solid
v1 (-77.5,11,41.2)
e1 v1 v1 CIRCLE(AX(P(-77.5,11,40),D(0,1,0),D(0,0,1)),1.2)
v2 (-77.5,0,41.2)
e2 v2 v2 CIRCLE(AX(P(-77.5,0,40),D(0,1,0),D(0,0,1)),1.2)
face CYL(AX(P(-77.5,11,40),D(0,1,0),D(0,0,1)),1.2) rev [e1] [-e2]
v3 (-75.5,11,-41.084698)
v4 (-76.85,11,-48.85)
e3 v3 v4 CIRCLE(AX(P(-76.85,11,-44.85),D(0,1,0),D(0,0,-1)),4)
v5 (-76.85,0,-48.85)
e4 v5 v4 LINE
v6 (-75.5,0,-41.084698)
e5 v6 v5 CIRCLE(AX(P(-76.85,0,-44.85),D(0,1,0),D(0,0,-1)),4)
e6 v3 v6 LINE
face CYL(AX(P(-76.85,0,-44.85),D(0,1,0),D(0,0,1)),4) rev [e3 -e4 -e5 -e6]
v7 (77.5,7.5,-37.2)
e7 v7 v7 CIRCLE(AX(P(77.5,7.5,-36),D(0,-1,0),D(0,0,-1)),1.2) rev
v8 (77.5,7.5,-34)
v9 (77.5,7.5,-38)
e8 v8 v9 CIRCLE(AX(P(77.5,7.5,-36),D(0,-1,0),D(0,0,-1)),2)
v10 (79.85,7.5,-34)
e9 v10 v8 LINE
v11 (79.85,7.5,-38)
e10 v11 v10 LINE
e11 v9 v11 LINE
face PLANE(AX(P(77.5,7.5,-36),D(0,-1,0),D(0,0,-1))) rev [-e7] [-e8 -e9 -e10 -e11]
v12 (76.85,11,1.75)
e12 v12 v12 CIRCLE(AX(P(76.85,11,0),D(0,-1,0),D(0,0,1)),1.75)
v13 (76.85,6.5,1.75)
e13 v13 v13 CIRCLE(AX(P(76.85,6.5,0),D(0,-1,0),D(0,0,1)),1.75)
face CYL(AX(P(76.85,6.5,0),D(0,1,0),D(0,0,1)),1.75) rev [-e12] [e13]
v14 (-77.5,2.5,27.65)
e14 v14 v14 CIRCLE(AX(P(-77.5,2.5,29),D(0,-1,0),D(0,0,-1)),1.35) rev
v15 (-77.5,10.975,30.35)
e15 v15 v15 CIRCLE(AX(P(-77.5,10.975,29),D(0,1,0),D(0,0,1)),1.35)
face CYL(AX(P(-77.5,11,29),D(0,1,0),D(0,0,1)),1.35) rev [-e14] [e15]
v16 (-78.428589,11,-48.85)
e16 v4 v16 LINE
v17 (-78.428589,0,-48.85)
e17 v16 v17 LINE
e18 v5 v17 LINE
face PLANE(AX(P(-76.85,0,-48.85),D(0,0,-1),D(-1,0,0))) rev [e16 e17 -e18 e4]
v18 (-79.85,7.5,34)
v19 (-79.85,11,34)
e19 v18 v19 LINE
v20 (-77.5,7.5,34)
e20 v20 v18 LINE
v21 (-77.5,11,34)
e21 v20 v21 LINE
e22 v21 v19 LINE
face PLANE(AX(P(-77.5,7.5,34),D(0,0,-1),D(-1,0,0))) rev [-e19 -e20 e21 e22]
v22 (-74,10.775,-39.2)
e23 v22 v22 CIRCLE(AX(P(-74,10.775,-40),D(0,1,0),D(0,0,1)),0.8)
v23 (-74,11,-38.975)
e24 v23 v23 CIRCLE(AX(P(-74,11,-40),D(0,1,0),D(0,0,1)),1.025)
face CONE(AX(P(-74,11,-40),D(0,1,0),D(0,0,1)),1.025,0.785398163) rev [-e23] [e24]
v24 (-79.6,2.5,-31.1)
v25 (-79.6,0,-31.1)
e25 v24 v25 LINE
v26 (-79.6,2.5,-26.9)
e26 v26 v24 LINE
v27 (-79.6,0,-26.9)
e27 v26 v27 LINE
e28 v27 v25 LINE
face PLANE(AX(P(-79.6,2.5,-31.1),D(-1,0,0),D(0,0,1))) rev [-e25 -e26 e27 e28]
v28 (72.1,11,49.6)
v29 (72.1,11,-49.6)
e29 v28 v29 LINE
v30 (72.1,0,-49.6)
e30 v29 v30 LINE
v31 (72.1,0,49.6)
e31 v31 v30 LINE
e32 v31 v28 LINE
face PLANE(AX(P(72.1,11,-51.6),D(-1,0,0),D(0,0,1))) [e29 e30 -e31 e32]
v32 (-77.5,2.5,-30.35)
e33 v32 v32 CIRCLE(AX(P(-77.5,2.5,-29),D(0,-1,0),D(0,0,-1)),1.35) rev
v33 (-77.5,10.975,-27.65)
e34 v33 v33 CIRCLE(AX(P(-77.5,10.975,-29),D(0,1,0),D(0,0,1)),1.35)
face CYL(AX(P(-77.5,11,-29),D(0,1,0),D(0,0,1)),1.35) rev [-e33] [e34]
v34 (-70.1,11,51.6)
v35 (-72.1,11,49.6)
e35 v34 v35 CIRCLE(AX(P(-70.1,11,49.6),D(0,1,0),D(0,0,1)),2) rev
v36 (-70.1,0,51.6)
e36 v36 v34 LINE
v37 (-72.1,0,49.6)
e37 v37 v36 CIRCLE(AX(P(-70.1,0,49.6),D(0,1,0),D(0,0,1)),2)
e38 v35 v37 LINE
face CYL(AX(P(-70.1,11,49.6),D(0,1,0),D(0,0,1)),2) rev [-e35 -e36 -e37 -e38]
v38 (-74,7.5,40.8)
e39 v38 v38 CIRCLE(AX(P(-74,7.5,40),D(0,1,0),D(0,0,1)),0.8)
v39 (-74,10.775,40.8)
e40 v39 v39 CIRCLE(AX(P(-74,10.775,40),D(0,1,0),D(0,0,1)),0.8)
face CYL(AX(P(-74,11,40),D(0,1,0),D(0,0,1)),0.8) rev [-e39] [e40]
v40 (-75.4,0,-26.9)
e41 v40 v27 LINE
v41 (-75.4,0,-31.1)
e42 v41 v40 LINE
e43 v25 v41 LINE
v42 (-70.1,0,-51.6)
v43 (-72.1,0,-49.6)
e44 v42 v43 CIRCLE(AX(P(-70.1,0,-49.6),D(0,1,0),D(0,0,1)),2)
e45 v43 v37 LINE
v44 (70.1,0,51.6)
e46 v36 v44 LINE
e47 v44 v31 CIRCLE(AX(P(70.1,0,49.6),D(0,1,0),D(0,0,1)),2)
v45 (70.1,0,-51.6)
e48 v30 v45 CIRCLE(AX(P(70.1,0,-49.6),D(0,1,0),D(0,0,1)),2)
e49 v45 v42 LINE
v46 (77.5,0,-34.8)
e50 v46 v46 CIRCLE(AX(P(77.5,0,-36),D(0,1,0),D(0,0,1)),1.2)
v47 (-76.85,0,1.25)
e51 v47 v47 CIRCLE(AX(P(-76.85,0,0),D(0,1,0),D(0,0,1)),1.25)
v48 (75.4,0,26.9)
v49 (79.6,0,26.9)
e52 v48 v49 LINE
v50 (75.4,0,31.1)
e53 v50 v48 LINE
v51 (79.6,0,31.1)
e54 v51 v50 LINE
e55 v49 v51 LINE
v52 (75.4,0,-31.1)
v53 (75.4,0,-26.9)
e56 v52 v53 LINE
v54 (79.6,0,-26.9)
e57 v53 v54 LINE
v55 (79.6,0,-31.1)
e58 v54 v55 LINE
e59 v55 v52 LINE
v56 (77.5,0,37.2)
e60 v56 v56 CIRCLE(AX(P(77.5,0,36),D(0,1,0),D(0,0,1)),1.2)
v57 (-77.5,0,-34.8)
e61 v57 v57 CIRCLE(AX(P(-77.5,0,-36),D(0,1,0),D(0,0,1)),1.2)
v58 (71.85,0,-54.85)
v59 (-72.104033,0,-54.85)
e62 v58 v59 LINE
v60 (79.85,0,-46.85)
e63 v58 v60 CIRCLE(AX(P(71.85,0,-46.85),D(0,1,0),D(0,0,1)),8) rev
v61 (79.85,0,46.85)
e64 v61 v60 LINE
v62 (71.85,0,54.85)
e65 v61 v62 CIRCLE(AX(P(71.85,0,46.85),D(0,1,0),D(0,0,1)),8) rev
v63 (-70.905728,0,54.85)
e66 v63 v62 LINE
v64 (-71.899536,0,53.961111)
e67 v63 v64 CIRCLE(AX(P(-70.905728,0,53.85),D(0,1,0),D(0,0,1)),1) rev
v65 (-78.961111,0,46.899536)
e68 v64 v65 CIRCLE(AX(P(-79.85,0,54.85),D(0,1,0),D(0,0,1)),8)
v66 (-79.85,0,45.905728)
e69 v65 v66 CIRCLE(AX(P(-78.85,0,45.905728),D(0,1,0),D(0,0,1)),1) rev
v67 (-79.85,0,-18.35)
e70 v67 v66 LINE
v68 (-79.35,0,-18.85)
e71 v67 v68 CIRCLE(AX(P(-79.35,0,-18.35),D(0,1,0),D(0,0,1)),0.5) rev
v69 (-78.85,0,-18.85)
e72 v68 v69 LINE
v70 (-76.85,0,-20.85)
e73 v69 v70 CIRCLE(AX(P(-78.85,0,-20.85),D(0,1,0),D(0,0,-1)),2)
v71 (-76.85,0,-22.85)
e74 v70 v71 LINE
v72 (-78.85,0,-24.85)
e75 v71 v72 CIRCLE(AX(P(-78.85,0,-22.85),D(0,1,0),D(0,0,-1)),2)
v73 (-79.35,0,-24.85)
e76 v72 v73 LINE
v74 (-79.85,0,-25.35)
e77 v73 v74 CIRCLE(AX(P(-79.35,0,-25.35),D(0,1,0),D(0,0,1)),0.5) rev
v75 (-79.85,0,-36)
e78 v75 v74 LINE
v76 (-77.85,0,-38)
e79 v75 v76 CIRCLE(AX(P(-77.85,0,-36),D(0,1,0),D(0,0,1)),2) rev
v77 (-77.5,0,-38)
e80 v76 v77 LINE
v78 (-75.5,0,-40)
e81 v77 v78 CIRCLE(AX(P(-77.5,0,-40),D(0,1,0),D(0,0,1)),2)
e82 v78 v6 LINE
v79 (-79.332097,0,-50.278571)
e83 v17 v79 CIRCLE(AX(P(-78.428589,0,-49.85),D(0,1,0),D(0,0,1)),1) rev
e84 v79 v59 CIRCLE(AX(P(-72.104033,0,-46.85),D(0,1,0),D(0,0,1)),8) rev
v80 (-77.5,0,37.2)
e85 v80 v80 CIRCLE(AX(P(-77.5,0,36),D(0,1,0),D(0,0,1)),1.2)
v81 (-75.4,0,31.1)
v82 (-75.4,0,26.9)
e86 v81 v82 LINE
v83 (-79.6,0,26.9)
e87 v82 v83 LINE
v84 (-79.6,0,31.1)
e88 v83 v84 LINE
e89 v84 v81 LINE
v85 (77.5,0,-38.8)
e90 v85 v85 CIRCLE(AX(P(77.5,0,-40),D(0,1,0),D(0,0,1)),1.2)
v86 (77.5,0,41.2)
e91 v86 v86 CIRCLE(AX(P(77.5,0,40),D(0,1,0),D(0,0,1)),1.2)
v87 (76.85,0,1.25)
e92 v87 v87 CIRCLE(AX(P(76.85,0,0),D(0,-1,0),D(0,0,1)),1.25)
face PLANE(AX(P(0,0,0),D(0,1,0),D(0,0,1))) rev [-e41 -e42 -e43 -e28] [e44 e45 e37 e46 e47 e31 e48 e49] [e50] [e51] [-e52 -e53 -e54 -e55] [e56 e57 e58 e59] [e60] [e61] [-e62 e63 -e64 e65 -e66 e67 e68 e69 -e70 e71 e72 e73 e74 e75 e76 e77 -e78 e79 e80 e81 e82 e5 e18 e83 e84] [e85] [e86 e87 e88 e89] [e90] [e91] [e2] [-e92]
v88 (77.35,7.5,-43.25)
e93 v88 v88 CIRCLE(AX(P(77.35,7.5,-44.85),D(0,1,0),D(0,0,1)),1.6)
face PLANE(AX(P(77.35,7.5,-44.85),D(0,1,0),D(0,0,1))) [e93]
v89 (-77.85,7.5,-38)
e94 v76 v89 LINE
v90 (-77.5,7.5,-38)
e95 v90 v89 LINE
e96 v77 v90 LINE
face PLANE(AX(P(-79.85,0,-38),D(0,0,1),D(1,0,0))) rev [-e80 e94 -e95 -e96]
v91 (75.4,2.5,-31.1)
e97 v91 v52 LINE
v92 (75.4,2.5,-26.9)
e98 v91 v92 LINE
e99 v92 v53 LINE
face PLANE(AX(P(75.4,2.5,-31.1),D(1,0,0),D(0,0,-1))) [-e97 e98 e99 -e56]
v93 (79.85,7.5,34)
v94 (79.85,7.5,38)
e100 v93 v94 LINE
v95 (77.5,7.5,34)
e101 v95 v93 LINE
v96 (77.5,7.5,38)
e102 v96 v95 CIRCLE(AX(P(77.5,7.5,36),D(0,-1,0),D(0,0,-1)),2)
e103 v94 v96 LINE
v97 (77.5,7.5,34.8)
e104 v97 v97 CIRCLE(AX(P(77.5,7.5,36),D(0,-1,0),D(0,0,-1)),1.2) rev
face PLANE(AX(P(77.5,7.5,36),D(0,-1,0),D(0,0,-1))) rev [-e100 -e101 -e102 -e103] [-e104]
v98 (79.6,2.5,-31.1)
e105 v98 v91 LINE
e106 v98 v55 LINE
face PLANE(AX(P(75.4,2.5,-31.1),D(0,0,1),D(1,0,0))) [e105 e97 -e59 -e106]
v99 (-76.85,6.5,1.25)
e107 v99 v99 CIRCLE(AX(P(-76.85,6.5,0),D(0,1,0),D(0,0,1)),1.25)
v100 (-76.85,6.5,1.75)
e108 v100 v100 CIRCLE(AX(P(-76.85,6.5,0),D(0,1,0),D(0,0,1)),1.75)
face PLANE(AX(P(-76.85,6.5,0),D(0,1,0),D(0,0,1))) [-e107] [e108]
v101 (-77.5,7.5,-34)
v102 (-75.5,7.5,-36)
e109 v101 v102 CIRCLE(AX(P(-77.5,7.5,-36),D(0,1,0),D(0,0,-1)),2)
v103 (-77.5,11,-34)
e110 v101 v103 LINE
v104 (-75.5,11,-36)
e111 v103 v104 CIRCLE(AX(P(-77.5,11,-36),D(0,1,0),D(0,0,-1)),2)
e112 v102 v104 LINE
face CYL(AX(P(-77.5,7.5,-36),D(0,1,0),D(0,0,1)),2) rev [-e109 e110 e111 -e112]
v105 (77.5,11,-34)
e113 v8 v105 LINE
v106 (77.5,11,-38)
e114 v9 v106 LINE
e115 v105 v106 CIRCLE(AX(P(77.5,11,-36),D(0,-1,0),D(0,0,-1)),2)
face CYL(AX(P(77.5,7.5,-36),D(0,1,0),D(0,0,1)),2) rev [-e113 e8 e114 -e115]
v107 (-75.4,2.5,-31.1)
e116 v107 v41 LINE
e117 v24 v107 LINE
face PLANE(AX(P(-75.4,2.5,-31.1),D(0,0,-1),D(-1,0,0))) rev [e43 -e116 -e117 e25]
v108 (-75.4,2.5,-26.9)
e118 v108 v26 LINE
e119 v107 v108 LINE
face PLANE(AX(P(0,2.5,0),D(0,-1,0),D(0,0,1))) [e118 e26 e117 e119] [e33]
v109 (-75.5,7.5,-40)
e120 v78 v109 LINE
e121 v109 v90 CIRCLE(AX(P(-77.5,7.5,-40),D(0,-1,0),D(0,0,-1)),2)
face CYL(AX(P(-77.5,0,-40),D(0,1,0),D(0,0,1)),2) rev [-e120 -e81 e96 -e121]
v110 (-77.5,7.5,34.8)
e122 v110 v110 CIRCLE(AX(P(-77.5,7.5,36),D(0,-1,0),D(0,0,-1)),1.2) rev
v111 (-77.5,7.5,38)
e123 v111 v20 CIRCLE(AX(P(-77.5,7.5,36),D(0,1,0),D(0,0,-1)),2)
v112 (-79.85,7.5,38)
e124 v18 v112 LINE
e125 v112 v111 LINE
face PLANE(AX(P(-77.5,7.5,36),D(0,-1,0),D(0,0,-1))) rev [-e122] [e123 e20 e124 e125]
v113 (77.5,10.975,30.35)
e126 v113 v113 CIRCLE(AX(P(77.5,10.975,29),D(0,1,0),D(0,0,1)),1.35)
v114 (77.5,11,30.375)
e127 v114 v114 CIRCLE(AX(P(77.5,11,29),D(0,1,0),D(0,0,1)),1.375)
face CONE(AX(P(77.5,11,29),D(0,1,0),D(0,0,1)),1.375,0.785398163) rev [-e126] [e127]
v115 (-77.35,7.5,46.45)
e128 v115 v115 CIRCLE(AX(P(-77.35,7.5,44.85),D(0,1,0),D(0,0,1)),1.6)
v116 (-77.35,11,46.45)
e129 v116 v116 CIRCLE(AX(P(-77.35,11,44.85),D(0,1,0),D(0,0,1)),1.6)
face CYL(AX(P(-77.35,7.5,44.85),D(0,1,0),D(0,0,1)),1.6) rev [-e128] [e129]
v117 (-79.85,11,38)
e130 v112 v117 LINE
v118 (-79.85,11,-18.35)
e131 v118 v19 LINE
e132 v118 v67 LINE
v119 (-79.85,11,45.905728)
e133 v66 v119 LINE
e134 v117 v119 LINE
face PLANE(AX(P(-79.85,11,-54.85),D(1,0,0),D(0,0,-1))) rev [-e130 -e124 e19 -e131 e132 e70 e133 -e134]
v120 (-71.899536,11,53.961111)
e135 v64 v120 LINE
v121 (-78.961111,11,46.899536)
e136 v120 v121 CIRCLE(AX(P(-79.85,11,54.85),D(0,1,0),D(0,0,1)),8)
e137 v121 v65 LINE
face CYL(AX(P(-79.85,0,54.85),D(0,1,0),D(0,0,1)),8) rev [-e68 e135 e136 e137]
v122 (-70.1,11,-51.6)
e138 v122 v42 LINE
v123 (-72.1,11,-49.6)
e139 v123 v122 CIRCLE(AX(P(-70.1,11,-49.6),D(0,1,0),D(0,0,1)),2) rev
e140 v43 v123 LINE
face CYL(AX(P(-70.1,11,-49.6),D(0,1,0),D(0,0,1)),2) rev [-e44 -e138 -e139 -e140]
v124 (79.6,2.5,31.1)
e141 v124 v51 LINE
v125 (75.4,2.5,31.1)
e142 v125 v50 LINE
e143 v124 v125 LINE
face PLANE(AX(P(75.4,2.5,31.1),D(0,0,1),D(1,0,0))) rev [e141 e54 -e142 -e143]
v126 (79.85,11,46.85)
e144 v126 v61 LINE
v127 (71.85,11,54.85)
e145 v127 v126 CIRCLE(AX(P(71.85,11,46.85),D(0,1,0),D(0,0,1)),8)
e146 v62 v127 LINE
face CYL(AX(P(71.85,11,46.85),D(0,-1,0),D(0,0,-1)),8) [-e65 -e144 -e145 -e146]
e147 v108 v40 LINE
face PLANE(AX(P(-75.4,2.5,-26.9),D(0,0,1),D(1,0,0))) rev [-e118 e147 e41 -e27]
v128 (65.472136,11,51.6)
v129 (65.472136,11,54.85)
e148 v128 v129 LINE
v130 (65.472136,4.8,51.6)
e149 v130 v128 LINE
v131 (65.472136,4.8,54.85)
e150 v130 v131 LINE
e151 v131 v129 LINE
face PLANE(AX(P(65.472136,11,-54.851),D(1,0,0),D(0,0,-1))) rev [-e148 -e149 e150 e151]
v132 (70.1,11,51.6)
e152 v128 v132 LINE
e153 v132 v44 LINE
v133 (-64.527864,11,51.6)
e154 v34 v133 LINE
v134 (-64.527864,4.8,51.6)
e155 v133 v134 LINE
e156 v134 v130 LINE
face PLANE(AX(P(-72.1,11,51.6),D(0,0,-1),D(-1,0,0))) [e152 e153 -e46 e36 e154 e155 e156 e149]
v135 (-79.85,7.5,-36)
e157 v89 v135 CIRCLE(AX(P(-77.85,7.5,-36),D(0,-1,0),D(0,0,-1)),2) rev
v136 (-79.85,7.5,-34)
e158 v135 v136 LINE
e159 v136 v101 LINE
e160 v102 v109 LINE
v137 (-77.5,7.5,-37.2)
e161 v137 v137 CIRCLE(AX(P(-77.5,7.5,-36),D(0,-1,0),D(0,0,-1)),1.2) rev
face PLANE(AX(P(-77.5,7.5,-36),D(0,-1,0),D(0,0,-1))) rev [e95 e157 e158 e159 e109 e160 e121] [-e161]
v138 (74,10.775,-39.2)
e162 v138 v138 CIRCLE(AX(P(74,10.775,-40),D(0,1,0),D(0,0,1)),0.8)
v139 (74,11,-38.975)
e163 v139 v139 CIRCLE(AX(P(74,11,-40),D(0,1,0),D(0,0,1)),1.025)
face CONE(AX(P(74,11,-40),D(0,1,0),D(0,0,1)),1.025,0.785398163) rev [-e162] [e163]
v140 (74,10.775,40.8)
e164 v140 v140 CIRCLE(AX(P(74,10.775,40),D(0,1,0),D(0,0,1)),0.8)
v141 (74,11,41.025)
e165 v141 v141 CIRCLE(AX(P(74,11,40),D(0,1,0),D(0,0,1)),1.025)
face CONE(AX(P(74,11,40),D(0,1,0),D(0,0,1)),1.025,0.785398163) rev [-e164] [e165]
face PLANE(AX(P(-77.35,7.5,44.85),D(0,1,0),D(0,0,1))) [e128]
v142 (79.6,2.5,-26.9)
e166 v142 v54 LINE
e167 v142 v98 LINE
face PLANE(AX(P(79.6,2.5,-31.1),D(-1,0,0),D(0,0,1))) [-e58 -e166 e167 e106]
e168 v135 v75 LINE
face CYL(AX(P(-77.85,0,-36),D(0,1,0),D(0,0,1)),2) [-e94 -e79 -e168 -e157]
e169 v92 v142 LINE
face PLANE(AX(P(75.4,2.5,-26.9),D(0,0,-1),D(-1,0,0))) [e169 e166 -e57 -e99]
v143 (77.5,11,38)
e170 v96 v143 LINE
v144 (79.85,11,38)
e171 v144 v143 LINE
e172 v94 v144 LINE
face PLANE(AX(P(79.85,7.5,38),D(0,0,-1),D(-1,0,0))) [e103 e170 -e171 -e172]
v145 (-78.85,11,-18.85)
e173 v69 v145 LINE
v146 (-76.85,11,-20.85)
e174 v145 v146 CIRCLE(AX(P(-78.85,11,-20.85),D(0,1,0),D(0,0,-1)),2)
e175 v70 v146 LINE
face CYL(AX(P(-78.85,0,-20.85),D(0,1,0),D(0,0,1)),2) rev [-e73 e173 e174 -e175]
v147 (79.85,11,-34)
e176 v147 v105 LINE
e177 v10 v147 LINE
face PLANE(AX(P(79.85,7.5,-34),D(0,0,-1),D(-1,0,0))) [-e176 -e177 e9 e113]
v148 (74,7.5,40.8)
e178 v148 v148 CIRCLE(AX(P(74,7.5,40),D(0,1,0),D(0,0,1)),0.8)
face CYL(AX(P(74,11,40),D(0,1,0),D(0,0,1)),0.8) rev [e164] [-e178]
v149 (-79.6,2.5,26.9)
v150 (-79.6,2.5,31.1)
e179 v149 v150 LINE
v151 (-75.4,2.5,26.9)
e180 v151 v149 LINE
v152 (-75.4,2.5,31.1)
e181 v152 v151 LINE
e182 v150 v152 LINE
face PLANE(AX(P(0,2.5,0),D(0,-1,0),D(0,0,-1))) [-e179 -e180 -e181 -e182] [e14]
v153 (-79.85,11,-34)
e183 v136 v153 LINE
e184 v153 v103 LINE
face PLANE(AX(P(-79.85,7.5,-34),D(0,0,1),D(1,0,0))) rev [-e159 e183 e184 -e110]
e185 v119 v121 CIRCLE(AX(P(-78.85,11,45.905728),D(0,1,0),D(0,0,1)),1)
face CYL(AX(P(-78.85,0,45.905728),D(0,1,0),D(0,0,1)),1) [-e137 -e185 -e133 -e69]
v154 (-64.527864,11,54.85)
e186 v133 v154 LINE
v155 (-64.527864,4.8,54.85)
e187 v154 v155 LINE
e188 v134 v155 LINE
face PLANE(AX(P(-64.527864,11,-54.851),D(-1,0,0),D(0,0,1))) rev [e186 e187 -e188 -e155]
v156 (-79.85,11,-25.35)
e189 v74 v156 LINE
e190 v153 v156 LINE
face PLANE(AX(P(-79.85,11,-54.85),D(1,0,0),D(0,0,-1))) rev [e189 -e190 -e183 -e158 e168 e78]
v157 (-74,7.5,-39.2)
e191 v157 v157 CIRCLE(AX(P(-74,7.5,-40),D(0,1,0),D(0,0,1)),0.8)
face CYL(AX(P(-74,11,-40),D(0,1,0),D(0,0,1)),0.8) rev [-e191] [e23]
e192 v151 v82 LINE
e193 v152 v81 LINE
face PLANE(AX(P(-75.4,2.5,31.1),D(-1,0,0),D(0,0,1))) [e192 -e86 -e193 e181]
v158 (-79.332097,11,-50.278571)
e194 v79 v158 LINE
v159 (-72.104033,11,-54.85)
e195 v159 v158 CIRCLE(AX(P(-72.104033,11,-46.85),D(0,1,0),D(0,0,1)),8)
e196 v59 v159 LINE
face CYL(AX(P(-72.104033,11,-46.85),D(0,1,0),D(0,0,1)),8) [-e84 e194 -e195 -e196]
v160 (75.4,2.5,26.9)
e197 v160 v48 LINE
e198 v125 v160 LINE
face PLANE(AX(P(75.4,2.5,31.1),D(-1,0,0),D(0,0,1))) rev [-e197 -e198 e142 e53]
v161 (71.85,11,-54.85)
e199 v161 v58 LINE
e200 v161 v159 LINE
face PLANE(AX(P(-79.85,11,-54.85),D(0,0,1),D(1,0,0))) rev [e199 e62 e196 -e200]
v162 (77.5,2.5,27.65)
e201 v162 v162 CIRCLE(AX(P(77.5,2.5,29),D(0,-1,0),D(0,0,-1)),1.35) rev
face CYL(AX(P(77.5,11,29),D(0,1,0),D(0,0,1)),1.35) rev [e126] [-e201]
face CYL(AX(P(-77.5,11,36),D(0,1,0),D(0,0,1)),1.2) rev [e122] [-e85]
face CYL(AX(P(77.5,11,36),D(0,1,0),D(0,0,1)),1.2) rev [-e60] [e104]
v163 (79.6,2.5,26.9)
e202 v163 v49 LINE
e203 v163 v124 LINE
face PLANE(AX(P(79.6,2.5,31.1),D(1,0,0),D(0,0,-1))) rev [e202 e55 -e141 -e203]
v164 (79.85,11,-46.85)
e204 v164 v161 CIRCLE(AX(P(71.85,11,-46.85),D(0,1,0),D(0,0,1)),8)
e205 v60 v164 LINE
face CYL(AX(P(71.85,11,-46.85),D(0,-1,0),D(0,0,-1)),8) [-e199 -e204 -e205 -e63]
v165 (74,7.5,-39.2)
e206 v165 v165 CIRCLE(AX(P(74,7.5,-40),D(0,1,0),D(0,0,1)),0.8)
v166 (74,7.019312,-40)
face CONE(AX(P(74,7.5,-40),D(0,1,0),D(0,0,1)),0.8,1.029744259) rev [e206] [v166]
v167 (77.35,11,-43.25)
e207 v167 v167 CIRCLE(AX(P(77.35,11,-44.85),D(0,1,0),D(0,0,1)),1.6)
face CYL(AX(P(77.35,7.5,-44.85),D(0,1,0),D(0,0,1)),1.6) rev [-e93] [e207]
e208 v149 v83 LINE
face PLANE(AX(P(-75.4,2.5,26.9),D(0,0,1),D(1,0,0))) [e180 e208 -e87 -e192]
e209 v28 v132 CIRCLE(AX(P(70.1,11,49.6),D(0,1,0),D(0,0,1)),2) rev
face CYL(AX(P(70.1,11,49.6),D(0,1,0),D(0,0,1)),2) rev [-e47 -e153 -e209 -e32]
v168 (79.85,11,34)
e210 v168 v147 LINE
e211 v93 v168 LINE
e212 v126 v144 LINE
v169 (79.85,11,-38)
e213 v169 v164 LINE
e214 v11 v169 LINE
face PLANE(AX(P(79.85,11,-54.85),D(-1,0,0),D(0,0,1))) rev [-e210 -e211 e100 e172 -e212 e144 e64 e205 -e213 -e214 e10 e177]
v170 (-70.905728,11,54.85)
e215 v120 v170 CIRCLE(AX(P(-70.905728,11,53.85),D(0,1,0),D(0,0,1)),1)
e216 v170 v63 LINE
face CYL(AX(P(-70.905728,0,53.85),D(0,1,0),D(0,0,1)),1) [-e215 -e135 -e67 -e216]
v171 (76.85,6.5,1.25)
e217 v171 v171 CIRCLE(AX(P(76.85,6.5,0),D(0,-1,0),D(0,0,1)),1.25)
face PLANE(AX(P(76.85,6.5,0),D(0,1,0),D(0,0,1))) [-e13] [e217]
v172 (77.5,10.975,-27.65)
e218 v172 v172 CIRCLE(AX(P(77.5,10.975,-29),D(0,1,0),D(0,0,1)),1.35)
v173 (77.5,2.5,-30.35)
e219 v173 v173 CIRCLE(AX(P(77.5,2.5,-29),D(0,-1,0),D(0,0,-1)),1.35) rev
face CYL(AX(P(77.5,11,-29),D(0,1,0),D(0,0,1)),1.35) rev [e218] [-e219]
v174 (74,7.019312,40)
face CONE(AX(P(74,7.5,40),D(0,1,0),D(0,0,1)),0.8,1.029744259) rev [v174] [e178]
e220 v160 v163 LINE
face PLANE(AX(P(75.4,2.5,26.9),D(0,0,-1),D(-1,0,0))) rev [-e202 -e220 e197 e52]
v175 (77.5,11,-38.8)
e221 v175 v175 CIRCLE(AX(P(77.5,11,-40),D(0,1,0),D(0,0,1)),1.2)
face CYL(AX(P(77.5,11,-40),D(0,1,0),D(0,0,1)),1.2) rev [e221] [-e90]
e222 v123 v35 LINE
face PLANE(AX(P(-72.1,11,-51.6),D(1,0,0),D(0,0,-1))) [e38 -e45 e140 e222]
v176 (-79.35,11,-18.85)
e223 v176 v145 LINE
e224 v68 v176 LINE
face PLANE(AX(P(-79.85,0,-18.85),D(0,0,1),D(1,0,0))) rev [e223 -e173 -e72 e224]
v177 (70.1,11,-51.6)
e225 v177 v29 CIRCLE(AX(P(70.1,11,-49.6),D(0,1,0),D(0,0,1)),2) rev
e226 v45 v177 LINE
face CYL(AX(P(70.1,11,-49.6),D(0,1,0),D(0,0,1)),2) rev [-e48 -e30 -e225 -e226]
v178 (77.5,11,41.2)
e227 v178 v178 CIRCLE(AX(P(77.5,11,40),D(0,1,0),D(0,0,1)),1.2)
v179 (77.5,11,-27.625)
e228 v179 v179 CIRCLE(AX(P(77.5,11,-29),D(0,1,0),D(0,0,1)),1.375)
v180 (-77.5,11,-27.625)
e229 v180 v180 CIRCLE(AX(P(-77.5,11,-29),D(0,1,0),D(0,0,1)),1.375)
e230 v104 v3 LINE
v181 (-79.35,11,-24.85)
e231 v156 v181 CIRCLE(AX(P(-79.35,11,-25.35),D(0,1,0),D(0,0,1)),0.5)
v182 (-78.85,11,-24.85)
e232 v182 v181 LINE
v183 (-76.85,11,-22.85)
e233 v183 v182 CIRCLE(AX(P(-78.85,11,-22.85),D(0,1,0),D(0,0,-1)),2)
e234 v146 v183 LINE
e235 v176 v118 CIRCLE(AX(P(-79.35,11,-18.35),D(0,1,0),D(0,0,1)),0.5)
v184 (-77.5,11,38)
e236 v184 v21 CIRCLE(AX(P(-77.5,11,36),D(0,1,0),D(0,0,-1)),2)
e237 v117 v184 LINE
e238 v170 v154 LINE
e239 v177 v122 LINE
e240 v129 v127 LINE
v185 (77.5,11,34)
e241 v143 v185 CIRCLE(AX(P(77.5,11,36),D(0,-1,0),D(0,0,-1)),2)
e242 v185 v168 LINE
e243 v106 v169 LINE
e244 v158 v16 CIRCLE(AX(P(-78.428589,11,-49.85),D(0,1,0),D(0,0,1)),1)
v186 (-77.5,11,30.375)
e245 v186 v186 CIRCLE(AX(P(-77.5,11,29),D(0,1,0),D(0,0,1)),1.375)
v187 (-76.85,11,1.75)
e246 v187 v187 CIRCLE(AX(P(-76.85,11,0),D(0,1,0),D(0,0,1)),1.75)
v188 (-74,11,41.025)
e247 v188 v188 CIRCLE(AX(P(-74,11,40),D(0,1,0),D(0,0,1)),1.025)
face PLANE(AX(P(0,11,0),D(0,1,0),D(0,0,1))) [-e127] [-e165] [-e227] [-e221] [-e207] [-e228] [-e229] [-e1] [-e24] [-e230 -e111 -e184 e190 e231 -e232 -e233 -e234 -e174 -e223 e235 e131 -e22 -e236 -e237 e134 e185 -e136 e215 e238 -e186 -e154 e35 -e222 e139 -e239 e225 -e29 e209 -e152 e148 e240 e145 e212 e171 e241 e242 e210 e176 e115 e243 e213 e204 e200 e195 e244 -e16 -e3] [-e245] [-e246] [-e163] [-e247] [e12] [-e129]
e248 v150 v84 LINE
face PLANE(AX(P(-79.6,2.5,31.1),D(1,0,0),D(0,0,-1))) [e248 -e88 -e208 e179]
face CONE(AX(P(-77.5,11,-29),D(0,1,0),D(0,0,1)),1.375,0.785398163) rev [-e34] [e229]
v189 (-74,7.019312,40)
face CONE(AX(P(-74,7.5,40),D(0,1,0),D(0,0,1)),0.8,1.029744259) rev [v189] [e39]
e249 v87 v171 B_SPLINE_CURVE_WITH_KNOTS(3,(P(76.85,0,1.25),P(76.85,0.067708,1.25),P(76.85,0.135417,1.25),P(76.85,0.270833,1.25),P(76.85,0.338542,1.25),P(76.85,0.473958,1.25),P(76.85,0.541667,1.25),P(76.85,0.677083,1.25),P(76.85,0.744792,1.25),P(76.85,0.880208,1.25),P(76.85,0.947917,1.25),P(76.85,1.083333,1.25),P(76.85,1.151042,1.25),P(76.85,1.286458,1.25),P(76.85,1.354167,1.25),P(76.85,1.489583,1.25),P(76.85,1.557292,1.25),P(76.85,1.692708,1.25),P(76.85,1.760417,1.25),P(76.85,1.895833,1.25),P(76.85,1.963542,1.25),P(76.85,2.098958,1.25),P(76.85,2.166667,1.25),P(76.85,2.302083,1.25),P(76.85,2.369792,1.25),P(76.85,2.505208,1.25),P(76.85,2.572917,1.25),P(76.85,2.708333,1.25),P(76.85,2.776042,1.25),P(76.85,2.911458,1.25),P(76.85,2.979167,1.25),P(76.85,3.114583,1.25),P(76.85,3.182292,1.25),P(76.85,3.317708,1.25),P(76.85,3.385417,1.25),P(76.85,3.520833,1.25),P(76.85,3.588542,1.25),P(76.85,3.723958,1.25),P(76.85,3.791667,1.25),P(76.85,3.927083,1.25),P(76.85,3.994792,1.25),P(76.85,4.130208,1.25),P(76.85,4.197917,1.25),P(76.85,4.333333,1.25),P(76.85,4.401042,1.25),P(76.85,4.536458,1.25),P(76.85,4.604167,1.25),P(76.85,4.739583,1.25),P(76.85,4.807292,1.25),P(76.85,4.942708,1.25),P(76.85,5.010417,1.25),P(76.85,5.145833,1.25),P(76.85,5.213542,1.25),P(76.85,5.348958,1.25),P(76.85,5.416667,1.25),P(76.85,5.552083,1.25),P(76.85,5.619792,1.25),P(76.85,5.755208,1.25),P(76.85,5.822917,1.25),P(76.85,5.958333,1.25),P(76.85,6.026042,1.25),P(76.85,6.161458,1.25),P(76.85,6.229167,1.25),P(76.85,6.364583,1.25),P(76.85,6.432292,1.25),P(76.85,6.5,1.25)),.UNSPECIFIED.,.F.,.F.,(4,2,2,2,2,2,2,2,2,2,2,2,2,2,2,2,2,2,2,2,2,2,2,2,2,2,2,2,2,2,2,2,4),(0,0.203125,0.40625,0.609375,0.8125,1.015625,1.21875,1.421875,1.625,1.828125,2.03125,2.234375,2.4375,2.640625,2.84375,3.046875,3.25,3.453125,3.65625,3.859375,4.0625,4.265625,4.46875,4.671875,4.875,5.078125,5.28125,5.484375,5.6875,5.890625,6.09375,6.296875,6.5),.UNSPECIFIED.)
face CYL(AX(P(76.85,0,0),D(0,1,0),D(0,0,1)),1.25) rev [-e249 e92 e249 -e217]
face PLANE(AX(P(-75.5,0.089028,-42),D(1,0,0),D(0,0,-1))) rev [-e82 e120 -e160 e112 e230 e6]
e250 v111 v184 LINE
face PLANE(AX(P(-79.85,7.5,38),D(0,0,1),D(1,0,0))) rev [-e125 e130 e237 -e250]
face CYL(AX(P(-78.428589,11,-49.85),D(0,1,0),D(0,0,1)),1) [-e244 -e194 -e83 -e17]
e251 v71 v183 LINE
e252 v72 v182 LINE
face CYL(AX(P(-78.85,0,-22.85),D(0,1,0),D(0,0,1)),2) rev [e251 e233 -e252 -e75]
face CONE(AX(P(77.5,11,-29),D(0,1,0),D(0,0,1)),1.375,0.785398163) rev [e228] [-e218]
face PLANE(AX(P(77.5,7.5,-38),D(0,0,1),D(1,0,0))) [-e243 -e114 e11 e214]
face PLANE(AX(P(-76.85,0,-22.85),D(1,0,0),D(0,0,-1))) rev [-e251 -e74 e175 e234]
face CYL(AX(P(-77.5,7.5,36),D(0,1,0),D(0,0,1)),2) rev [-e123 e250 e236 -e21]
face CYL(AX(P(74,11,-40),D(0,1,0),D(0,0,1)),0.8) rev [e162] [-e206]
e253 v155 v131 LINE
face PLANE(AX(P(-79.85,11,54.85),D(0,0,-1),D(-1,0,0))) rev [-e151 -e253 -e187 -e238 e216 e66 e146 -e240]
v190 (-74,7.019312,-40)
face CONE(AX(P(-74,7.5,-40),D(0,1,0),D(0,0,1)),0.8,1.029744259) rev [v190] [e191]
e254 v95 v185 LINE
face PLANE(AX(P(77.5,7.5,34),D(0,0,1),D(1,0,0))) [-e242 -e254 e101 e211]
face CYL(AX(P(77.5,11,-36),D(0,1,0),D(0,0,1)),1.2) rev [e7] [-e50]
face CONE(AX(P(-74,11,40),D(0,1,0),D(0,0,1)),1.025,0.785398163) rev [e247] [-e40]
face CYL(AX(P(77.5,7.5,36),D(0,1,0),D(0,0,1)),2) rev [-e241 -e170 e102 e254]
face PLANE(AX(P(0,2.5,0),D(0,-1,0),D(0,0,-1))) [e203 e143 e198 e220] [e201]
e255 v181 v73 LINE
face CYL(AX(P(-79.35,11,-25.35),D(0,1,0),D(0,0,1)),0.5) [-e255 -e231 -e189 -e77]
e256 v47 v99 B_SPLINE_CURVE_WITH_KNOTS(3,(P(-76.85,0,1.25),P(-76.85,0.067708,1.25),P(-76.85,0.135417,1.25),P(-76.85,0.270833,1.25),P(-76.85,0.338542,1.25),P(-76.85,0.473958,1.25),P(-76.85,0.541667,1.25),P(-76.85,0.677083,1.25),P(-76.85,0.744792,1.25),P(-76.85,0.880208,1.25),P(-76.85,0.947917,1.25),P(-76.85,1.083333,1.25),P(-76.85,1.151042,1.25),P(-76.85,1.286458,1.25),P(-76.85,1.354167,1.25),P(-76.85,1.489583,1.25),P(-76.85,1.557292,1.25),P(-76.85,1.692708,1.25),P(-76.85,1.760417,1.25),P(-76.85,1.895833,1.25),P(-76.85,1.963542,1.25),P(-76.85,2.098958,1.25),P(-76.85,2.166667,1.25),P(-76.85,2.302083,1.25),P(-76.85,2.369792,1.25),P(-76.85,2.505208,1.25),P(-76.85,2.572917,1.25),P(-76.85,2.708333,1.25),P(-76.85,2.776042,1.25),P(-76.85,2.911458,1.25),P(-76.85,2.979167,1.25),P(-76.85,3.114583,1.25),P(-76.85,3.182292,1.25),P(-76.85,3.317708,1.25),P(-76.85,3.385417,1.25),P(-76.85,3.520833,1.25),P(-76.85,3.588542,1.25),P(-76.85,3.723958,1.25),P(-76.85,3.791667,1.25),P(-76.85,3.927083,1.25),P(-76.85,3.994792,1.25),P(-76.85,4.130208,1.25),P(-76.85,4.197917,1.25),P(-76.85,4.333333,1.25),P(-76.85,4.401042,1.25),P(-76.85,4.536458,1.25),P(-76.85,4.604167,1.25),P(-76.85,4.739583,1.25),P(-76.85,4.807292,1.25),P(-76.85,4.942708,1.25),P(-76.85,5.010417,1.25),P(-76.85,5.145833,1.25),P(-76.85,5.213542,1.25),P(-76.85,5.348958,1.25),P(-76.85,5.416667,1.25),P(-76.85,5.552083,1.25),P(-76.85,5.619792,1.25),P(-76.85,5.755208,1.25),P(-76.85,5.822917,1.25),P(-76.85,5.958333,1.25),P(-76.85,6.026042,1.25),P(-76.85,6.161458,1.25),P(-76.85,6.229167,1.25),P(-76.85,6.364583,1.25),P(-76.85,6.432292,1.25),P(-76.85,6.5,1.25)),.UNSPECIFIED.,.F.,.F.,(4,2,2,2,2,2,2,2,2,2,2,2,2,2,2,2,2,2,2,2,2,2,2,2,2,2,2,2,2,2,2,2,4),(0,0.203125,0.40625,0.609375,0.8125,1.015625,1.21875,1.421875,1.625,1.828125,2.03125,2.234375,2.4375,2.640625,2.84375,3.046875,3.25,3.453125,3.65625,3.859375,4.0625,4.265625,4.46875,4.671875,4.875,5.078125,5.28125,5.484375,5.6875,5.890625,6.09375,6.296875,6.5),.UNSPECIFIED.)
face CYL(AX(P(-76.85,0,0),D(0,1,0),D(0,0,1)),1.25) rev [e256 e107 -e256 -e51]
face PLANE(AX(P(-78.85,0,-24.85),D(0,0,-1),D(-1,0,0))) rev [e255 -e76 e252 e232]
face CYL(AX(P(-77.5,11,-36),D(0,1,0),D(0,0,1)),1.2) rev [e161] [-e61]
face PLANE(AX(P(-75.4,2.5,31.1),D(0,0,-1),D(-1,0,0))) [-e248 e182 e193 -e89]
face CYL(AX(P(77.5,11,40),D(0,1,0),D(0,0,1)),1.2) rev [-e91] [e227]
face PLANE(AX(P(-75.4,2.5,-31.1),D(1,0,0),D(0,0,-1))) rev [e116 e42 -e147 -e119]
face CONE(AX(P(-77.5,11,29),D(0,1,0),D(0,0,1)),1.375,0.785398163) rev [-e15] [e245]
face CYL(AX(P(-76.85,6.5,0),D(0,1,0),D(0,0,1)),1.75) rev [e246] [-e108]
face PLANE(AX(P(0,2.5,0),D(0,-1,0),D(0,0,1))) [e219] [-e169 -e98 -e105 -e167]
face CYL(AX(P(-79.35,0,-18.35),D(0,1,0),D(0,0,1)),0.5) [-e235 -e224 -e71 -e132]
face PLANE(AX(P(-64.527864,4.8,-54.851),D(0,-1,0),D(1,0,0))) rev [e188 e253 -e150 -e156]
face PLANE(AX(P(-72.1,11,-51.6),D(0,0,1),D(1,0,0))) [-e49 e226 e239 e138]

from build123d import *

# Parameters (mm, degrees)
SKETCH1_W                            = 159.7
SKETCH1_H                            = 109.7
SKETCH1_W_2                          = 144.2
SKETCH1_H_2                          = 103.2
BOSS_EXTRUDE1_DEPTH                  = 11
F_2_4_2_4_DIAMETER_HOLE1_D           = 2.4
CUT_EXTRUDE10_DEPTH                  = 3.5
LPATTERN1_COUNT                      = 2
LPATTERN1_PITCH                      = 72
MIRROR2_COPY_1_DEPTH                 = 3.5
M2X0_4_TAPPED_HOLE1_D                = 1.6
M2X0_4_TAPPED_HOLE1_DEPTH            = 3.5
M2X0_4_TAPPED_HOLE1_CSINK_D          = 2.05
M2X0_4_TAPPED_HOLE1_CSINK_ANGLE      = 90
M2X0_4_TAPPED_HOLE1_TIP              = 0.480688495
SKETCH11_W                           = 4.35
SKETCH11_H                           = 6
CUT_EXTRUDE4_DEPTH                   = 3.5
CUT_EXTRUDE11_DEPTH                  = 98.16375353
CUT_EXTRUDE11_DEPTH_BACK             = 98.16375353
F_2_4_2_4_DIAMETER_HOLE2_D           = 2.4
F_2_7_2_7_DIAMETER_HOLE1_D           = 2.7
F_2_7_2_7_DIAMETER_HOLE1_CSINK_D     = 2.75
F_2_7_2_7_DIAMETER_HOLE1_CSINK_ANGLE = 90
CUT_EXTRUDE6_DEPTH                   = 98.496384548
SKETCH19_R                           = 1.6
CUT_EXTRUDE7_DEPTH                   = 3.5
CUT_EXTRUDE8_DEPTH                   = 98.496384548
SKETCH8_R                            = 8
CUT_EXTRUDE9_DEPTH                   = 98.496384548
FILLET1_R                            = 2
FILLET2_R                            = 8
FILLET3_R                            = 1
FILLET4_R                            = 2
FILLET5_R                            = 0.5
CUT_EXTRUDE13_REACH                  = 138.129
SKETCH33_W                           = 130
SKETCH33_H                           = 6.2
SKETCH34_W                           = 4.2
SKETCH34_H                           = 4.2
CUT_EXTRUDE14_DEPTH                  = 2.5
MIRROR5_COPY_1_SKETCH_W              = 4.2
MIRROR5_COPY_1_SKETCH_H              = 4.2
MIRROR5_COPY_1_DEPTH                 = 2.5
SKETCH35_R                           = 1.75
CUT_EXTRUDE15_DEPTH                  = 4.5
SKETCH38_R                           = 1.25
CUT_EXTRUDE17_DEPTH                  = 98.091683475


with BuildPart() as part:
    # Sketch1 → Boss-Extrude1 (new body)
    with BuildSketch(Plane(origin=(0, 0, 0), x_dir=(1, 0, 0), z_dir=(0, 1, 0))):
        Rectangle(SKETCH1_W, SKETCH1_H)
        Rectangle(SKETCH1_W_2, SKETCH1_H_2, mode=Mode.SUBTRACT)
    extrude(amount=BOSS_EXTRUDE1_DEPTH)

    # Ø2.4 (2.4) Diameter Hole1 (through all)
    with Locations(Plane(origin=(0, 11, 0), x_dir=(1, 0, 0), z_dir=(0, 1, 0))):
        with Locations((-77.5, 36), (77.5, 36), (-77.5, -36), (77.5, -36)):
            Hole(F_2_4_2_4_DIAMETER_HOLE1_D / 2)

    # Sketch29 → Cut-Extrude10 (cut)
    with BuildSketch(Plane(origin=(0, 11, 0), x_dir=(1, 0, 0), z_dir=(0, 1, 0))):
        with BuildLine():
            Line((-77.5, 38), (-79.85, 38))
            Line((-79.85, 38), (-79.85, 34))
            Line((-79.85, 34), (-77.5, 34))
            ThreePointArc((-77.5, 34), (-75.5, 36), (-77.5, 38))
        make_face()
    cut_extrude10 = extrude(amount=-CUT_EXTRUDE10_DEPTH, mode=Mode.SUBTRACT)

    # LPattern1: Cut-Extrude10 ×2
    with Locations(*[(0, 0, i * LPATTERN1_PITCH) for i in range(1, LPATTERN1_COUNT)]):
        add(cut_extrude10, mode=Mode.SUBTRACT)

    # Mirror2: Cut-Extrude10 across plane
    add(cut_extrude10.mirror(Plane(origin=(0, 0, 0), x_dir=(0, 0, 1), z_dir=(1, 0, 0))), mode=Mode.SUBTRACT)

    # Mirror2 copy 1 sketch → Mirror2 copy 1 (cut)
    with BuildSketch(Plane(origin=(0, 11, 72), x_dir=(-1, 0, 0), z_dir=(0, 1, 0))):
        with BuildLine():
            Line((-77.5, -38), (-79.85, -38))
            Line((-79.85, -38), (-79.85, -34))
            Line((-79.85, -34), (-77.5, -34))
            ThreePointArc((-77.5, -34), (-75.5, -36), (-77.5, -38))
        make_face()
    extrude(amount=-MIRROR2_COPY_1_DEPTH, mode=Mode.SUBTRACT)

    # M2x0.4 Tapped Hole1
    with Locations(Plane(origin=(0, 11, 0), x_dir=(1, 0, 0), z_dir=(0, 1, 0))):
        with Locations((-74, 40), (-74, -40), (74, 40), (74, -40)):
            CounterSinkHole(M2X0_4_TAPPED_HOLE1_D / 2, M2X0_4_TAPPED_HOLE1_CSINK_D / 2, depth=M2X0_4_TAPPED_HOLE1_DEPTH, counter_sink_angle=M2X0_4_TAPPED_HOLE1_CSINK_ANGLE)
            with Locations((0, 0, -(M2X0_4_TAPPED_HOLE1_DEPTH + M2X0_4_TAPPED_HOLE1_TIP / 2))):  # 118° drill point
                Cone(0, M2X0_4_TAPPED_HOLE1_D / 2, M2X0_4_TAPPED_HOLE1_TIP, mode=Mode.SUBTRACT)

    # Sketch11 → Cut-Extrude4 (cut)
    with BuildSketch(Plane(origin=(0, 11, 0), x_dir=(1, 0, 0), z_dir=(0, 1, 0))):
        with Locations((-77.675, 39)):
            Rectangle(SKETCH11_W, SKETCH11_H)
    extrude(amount=-CUT_EXTRUDE4_DEPTH, mode=Mode.SUBTRACT)

    # Sketch30 → Cut-Extrude11 (cut, two sides: drawn at the far end of the back side and taken through both)
    with BuildSketch(Plane(origin=(0, 7.5, 0), x_dir=(1, 0, 0), z_dir=(0, 1, 0)).offset(-CUT_EXTRUDE11_DEPTH_BACK)):
        with BuildLine():
            Line((-75.5, 40), (-75.5, 42))
            Line((-75.5, 42), (-79.85, 42))
            Line((-79.85, 42), (-79.85, 38))
            Line((-79.85, 38), (-77.5, 38))
            ThreePointArc((-77.5, 38), (-76.085786438, 38.585786438), (-75.5, 40))
        make_face()
    extrude(amount=CUT_EXTRUDE11_DEPTH + CUT_EXTRUDE11_DEPTH_BACK, mode=Mode.SUBTRACT)

    # Ø2.4 (2.4) Diameter Hole2 (through all)
    with Locations(Plane(origin=(0, 11, 0), x_dir=(1, 0, 0), z_dir=(0, 1, 0))):
        with Locations((-77.5, -40), (77.5, 40), (77.5, -40)):
            Hole(F_2_4_2_4_DIAMETER_HOLE2_D / 2)

    # Ø2.7 (2.7) Diameter Hole1 (through all)
    with Locations(Plane(origin=(0, 11, 0), x_dir=(1, 0, 0), z_dir=(0, 1, 0))):
        with Locations((-77.5, 29), (-77.5, -29), (77.5, 29), (77.5, -29)):
            CounterSinkHole(F_2_7_2_7_DIAMETER_HOLE1_D / 2, F_2_7_2_7_DIAMETER_HOLE1_CSINK_D / 2, counter_sink_angle=F_2_7_2_7_DIAMETER_HOLE1_CSINK_ANGLE)

    # Sketch18 → Cut-Extrude6 (cut, through all)
    with BuildSketch(Plane(origin=(0, 11, 0), x_dir=(1, 0, 0), z_dir=(0, 1, 0))):
        with BuildLine():
            Line((-78.85, 24.85), (-79.85, 24.85))
            Line((-79.85, 24.85), (-79.85, 18.85))
            Line((-79.85, 18.85), (-78.85, 18.85))
            ThreePointArc((-78.85, 18.85), (-77.435786438, 19.435786438), (-76.85, 20.85))
            Line((-76.85, 20.85), (-76.85, 22.85))
            ThreePointArc((-76.85, 22.85), (-77.435786438, 24.264213562), (-78.85, 24.85))
        make_face()
    extrude(amount=-CUT_EXTRUDE6_DEPTH, mode=Mode.SUBTRACT)

    # Sketch19 → Cut-Extrude7 (cut)
    with BuildSketch(Plane(origin=(0, 11, 0), x_dir=(1, 0, 0), z_dir=(0, 1, 0))):
        with Locations(Location((77.35, 44.85, 0), (0, 0, 270))):
            Circle(SKETCH19_R)
        with Locations(Location((-77.35, -44.85, 0), (0, 0, 270))):
            Circle(SKETCH19_R)
    extrude(amount=-CUT_EXTRUDE7_DEPTH, mode=Mode.SUBTRACT)

    # Sketch7 → Cut-Extrude8 (cut, through all)
    with BuildSketch(Plane(origin=(0, 11, 0), x_dir=(1, 0, 0), z_dir=(0, 1, 0))):
        with BuildLine():
            Line((-76.85, 48.85), (-79.85, 48.85))
            Line((-79.85, 48.85), (-79.85, 40.85))
            Line((-79.85, 40.85), (-76.85, 40.85))
            ThreePointArc((-76.85, 40.85), (-72.85, 44.85), (-76.85, 48.85))
        make_face()
    extrude(amount=-CUT_EXTRUDE8_DEPTH, mode=Mode.SUBTRACT)

    # Sketch8 → Cut-Extrude9 (cut, through all)
    with BuildSketch(Plane(origin=(0, 11, 0), x_dir=(1, 0, 0), z_dir=(0, 1, 0))):
        with Locations((-79.85, -54.85)):
            Circle(SKETCH8_R)
    extrude(amount=-CUT_EXTRUDE9_DEPTH, mode=Mode.SUBTRACT)

    # Fillet1
    fillet1_edges = [part.edges().sort_by_distance(p)[0] for p in [
        (72.1, 5.5, 51.6),
        (72.1, 5.5, -51.6),
        (-72.1, 5.5, -51.6),
        (-72.1, 5.5, 51.6),
    ]]
    fillet(fillet1_edges, radius=FILLET1_R)

    # Fillet2
    # the kernel refuses this fillet: 8 mm, written as the material it takes off along each edge
    with BuildSketch(Plane(origin=(79.85, -20, 54.85), x_dir=(-1, 0, 0), z_dir=(0, 1, 0)), Plane(origin=(79.85, -20, -54.85), x_dir=(0, 0, 1), z_dir=(0, 1, 0))) as fillet2_piece_1:
        with BuildLine():
            CenterArc((FILLET2_R, -FILLET2_R), FILLET2_R, 90, 90)
            Line((0, -FILLET2_R), (-FILLET2_R * 0.02, -FILLET2_R))
            Line((-FILLET2_R * 0.02, -FILLET2_R), (-FILLET2_R * 0.02, FILLET2_R * 0.02))
            Line((-FILLET2_R * 0.02, FILLET2_R * 0.02), (FILLET2_R, FILLET2_R * 0.02))
            Line((FILLET2_R, FILLET2_R * 0.02), (FILLET2_R, 0))
        make_face()
    extrude(amount=51, mode=Mode.SUBTRACT)
    with BuildSketch(Plane(origin=(-79.85, -19.364916731, -54.85), x_dir=(1, 0, 0), z_dir=(0, 1, 0))) as fillet2_piece_2:
        with BuildLine():
            CenterArc((7.745966692, -8), FILLET2_R, 90, 75.522487814)
            Line((0, -6), (-0.154919334, -5.96))
            ThreePointArc((-0.154919334, -5.96), (-0.16, -3), (-0.16, 0))
            Line((-0.16, 0), (0, 0.16))
            Line((0, 0.16), (7.745966692, 0.16))
            Line((7.745966692, 0.16), (7.745966692, 0))
        make_face()
    extrude(amount=49.729833462, mode=Mode.SUBTRACT)

    # Fillet3
    fillet3_edges = [part.edges().sort_by_distance(p)[0] for p in [
        (-79.85, 5.5, -48.85),
        (-71.85, 5.5, 54.85),
        (-79.85, 5.5, 46.85),
    ]]
    fillet(fillet3_edges, radius=FILLET3_R)

    # Fillet4
    fillet4_edges = [part.edges().sort_by_distance(p)[0] for p in [
        (-79.85, 3.75, -38),
    ]]
    fillet(fillet4_edges, radius=FILLET4_R)

    # Fillet5
    fillet5_edges = [part.edges().sort_by_distance(p)[0] for p in [
        (-79.85, 5.5, -18.85),
        (-79.85, 5.5, -24.85),
    ]]
    fillet(fillet5_edges, radius=FILLET5_R)

    # Sketch33 → Cut-Extrude13 (cut, up to next)
    with BuildSketch(Plane.XY.offset(54.85), mode=Mode.PRIVATE) as cut_extrude13_sk1:
        with Locations((0.472135955, 7.9)):
            Rectangle(SKETCH33_W, SKETCH33_H)
    cut_extrude13_tool1 = extrude(cut_extrude13_sk1.sketch, amount=-CUT_EXTRUDE13_REACH, mode=Mode.PRIVATE) & part.part
    add(cut_extrude13_tool1.solids().sort_by_distance((0.472136, 7.9, 54.85))[0], mode=Mode.SUBTRACT)

    # Sketch34 → Cut-Extrude14 (cut)
    with BuildSketch(Plane(origin=(0, 0, 0), x_dir=(-1, 0, 0), z_dir=(0, -1, 0))):
        with Locations((-77.5, -29)):
            Rectangle(SKETCH34_W, SKETCH34_H)
    cut_extrude14 = extrude(amount=-CUT_EXTRUDE14_DEPTH, mode=Mode.SUBTRACT)

    # Mirror4: Cut-Extrude14 across plane
    add(cut_extrude14.mirror(Plane.XY), mode=Mode.SUBTRACT)

    # Mirror5: Cut-Extrude14 across plane
    add(cut_extrude14.mirror(Plane(origin=(0, 0, 0), x_dir=(0, 0, 1), z_dir=(1, 0, 0))), mode=Mode.SUBTRACT)

    # Mirror5 copy 1 sketch → Mirror5 copy 1 (cut)
    with BuildSketch(Plane.XZ):
        with Locations((-77.5, -29)):
            Rectangle(MIRROR5_COPY_1_SKETCH_W, MIRROR5_COPY_1_SKETCH_H)
    extrude(amount=-MIRROR5_COPY_1_DEPTH, mode=Mode.SUBTRACT)

    # Sketch35 → Cut-Extrude15 (cut)
    with BuildSketch(Plane(origin=(0, 11, 0), x_dir=(1, 0, 0), z_dir=(0, 1, 0))):
        with Locations(Location((-76.85, 0, 0), (0, 0, 270))):
            Circle(SKETCH35_R)
    cut_extrude15 = extrude(amount=-CUT_EXTRUDE15_DEPTH, mode=Mode.SUBTRACT)

    # Sketch38 → Cut-Extrude17 (cut, through all)
    with BuildSketch(Plane(origin=(0, 6.5, 0), x_dir=(1, 0, 0), z_dir=(0, 1, 0))):
        with Locations(Location((-76.85, 0, 0), (0, 0, 270))):
            Circle(SKETCH38_R)
    cut_extrude17 = extrude(amount=-CUT_EXTRUDE17_DEPTH, mode=Mode.SUBTRACT)

    # Mirror7: Cut-Extrude15, Cut-Extrude17 across plane
    add(cut_extrude15.mirror(Plane(origin=(0, 0, 0), x_dir=(0, 0, 1), z_dir=(1, 0, 0))), mode=Mode.SUBTRACT)
    add(cut_extrude17.mirror(Plane(origin=(0, 0, 0), x_dir=(0, 0, 1), z_dir=(1, 0, 0))), mode=Mode.SUBTRACT)


solid = part.part
